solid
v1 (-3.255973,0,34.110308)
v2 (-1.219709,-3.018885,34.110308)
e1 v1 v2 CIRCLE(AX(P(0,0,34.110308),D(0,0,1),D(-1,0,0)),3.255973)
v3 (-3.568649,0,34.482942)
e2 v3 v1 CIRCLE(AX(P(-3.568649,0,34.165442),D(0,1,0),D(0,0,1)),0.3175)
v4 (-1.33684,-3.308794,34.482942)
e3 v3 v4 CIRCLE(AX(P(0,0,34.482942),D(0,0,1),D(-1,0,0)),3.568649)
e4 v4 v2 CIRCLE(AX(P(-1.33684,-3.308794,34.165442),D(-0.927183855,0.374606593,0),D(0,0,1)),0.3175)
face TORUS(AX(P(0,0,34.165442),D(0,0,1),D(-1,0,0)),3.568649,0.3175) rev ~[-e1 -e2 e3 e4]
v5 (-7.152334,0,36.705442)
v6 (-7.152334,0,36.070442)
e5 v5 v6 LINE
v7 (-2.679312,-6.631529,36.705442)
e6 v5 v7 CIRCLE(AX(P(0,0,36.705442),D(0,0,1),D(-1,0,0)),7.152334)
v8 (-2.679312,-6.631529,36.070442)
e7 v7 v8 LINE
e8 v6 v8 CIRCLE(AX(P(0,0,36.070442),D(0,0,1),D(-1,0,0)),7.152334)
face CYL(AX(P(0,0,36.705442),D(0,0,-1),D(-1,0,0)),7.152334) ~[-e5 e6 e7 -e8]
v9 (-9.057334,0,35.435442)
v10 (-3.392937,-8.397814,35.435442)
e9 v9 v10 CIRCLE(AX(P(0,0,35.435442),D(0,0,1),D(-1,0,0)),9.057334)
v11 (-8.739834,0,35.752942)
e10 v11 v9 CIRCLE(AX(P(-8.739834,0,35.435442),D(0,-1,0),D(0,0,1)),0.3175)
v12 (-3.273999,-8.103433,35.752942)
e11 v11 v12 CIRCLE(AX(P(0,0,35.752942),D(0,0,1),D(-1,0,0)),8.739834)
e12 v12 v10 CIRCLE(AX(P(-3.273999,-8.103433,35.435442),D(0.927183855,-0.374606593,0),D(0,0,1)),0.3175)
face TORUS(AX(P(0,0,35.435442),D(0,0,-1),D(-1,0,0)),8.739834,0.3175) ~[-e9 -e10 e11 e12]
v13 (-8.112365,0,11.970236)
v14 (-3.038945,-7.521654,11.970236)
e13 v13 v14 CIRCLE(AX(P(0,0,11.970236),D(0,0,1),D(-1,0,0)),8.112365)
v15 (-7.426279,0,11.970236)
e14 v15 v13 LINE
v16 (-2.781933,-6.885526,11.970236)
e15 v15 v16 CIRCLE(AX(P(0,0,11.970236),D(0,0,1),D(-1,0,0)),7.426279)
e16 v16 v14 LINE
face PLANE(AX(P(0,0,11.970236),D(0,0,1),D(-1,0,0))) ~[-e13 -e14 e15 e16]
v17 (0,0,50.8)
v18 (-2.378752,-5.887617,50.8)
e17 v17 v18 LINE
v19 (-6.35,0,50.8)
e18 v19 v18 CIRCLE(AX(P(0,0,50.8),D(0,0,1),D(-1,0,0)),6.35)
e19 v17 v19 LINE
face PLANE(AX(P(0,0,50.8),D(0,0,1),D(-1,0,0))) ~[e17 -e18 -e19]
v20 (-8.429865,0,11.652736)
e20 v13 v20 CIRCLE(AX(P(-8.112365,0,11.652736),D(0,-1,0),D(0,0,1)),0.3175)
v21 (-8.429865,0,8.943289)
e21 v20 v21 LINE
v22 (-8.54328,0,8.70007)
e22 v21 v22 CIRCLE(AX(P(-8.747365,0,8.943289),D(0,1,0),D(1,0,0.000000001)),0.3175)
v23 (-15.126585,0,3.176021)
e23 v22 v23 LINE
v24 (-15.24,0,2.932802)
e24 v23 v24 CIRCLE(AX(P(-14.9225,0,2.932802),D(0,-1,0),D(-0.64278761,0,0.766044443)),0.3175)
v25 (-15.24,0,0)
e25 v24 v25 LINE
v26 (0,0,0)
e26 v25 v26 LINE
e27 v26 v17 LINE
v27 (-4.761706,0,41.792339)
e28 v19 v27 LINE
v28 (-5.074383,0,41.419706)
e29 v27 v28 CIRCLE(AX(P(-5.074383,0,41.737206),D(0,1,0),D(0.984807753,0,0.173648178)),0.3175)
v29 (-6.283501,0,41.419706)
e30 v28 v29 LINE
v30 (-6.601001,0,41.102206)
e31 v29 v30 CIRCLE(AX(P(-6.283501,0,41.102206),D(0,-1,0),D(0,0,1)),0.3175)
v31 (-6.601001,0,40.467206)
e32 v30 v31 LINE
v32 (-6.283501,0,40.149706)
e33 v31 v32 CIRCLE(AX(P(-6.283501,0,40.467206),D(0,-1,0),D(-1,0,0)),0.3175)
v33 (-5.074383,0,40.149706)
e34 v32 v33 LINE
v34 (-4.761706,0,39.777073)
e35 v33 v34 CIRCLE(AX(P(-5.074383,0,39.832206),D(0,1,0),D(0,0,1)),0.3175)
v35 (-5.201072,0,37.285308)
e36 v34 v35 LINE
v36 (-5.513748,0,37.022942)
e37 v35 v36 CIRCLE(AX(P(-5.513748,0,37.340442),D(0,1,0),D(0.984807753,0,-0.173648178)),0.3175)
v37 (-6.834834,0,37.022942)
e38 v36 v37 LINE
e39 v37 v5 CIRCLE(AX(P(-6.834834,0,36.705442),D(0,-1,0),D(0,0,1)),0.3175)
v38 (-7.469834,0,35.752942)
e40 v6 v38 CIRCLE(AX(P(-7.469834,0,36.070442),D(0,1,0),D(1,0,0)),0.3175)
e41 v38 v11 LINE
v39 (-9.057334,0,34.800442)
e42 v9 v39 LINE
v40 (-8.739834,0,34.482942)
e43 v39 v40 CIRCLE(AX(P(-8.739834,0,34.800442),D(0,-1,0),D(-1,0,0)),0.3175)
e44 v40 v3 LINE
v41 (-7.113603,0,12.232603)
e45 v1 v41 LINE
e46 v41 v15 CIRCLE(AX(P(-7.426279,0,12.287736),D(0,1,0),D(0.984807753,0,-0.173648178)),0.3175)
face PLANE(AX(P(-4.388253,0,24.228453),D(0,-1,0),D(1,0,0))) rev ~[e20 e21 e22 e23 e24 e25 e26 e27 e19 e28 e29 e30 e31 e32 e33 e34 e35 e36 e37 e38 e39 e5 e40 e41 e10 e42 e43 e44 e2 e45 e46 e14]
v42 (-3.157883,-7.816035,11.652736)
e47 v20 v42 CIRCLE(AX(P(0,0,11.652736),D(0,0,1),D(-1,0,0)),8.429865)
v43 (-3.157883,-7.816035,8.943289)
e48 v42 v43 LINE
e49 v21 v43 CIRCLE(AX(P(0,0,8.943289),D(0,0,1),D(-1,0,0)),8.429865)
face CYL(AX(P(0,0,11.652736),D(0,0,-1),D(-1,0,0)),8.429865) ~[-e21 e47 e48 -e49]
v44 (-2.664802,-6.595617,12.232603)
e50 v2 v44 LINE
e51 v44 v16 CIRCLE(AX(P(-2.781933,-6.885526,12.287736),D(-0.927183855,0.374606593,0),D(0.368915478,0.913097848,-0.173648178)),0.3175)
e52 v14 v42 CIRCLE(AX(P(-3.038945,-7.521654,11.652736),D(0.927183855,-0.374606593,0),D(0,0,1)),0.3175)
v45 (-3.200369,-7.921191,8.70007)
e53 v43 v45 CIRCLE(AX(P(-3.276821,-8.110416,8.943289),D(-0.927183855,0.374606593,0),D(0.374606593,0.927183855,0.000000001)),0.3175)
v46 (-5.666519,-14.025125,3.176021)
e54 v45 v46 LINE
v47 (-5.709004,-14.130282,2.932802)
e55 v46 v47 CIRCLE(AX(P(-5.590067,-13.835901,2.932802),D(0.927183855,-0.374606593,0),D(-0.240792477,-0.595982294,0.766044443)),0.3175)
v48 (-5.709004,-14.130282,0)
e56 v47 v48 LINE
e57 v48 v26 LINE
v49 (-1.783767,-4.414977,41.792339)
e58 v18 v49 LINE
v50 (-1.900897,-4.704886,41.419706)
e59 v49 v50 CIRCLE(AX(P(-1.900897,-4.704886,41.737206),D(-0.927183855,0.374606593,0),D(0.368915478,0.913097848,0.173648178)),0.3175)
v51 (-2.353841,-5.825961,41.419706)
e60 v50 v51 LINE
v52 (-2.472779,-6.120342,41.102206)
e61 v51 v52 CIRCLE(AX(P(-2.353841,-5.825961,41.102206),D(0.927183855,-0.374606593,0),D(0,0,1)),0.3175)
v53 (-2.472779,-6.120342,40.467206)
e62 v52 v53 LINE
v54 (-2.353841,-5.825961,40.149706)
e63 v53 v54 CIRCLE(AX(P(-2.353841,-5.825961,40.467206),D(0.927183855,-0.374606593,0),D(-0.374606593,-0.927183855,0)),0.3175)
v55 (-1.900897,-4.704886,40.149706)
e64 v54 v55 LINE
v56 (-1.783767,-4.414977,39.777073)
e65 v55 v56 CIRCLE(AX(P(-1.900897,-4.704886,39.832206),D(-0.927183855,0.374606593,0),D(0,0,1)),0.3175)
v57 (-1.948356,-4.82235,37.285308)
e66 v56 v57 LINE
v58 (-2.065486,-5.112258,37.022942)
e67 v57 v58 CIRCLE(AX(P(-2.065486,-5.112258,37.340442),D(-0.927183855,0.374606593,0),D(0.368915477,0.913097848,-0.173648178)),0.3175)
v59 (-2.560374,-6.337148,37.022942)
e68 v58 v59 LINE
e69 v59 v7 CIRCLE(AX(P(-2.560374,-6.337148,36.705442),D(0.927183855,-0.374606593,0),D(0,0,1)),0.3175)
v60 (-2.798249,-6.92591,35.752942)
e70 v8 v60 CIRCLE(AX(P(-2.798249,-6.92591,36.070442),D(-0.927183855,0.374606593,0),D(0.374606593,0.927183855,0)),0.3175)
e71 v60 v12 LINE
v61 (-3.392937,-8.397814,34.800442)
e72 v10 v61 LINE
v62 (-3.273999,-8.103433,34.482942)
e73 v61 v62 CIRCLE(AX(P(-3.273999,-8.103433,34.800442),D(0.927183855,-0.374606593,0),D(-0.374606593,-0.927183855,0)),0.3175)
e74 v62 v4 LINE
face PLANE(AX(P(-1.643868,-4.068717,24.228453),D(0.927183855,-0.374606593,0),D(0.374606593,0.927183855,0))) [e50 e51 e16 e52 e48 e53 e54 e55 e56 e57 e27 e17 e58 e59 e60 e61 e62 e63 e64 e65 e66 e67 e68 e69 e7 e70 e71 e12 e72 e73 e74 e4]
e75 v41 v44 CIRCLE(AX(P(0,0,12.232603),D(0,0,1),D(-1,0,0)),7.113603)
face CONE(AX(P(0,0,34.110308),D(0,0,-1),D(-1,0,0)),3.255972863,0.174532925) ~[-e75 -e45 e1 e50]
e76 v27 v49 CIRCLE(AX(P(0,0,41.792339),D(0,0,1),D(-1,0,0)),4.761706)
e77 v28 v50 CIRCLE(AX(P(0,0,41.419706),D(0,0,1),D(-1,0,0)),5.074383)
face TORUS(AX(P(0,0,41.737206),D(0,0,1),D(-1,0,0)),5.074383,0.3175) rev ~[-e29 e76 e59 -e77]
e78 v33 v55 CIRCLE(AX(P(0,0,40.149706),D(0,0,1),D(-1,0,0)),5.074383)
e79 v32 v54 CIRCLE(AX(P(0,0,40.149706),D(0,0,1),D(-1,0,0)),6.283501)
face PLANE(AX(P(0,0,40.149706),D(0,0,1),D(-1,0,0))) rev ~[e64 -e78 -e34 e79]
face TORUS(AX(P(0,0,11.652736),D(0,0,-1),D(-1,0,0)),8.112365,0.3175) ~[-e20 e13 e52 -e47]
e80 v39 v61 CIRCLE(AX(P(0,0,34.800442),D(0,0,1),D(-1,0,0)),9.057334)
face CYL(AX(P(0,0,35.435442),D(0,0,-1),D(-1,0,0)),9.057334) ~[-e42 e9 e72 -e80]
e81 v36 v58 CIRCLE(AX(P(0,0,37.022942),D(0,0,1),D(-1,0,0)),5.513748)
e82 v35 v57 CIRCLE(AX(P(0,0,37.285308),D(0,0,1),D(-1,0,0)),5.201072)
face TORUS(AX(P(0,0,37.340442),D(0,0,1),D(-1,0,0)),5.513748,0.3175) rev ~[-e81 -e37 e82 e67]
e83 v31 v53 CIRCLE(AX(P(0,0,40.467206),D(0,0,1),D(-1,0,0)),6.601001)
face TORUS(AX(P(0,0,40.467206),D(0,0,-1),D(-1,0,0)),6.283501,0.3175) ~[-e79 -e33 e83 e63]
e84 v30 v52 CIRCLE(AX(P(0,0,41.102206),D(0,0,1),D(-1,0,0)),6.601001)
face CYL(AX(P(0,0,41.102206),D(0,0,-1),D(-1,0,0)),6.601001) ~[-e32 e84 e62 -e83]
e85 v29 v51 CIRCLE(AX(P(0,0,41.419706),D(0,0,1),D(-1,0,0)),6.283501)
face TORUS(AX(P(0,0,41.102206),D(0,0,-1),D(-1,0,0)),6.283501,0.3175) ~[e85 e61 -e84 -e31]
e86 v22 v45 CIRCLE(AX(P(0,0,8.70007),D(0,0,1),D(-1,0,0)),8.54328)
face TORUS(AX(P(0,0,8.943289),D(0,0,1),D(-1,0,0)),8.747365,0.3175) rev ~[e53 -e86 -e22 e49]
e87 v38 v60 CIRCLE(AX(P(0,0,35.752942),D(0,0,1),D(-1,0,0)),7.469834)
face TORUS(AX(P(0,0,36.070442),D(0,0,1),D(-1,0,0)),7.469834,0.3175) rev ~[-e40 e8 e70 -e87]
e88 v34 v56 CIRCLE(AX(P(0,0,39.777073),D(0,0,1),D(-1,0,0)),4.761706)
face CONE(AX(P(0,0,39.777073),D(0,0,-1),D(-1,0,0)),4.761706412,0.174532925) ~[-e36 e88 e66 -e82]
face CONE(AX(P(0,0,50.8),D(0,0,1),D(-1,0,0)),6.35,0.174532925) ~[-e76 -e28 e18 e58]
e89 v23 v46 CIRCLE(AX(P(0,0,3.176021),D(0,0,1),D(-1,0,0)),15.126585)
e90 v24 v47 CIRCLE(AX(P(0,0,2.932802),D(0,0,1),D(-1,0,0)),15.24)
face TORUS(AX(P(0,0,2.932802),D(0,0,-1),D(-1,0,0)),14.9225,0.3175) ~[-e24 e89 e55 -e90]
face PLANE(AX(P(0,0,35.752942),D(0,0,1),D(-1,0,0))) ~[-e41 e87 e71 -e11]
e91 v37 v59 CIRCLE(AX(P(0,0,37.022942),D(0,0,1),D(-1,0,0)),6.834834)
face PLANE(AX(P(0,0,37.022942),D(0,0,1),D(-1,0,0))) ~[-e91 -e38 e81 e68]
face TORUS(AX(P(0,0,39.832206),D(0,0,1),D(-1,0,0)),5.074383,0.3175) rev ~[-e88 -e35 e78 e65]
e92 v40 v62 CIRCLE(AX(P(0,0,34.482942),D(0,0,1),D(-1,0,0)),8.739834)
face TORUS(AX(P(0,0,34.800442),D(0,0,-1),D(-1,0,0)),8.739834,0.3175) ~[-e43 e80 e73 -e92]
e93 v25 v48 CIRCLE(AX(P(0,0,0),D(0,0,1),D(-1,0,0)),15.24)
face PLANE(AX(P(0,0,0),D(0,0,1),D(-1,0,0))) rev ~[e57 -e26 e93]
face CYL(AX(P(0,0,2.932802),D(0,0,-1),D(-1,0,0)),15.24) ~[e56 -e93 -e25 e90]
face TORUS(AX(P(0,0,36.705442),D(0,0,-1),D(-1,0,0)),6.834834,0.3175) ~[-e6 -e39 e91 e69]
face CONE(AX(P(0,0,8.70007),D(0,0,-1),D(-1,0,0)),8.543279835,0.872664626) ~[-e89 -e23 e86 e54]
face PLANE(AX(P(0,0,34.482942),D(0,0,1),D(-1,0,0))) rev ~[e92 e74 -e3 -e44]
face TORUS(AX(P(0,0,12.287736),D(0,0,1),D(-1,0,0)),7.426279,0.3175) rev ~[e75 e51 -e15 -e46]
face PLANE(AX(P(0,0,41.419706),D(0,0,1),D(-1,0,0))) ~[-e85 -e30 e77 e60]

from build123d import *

# Parameters (mm, degrees)
F1_ANGLE = 68


# Not quite as in the source:
# - a feature of the source that left no trace in its solid (it failed there, or was rolled back) is left out


with BuildPart() as f1:
    # F0 (on Front) → F1 (revolve)
    with BuildSketch(Plane.XZ):
        with BuildLine():
            Line((-15.24, 0), (0, 0))
            Line((0, 0), (0, 50.8))
            Line((0, 50.8), (-6.35, 50.8))
            Line((-6.35, 50.8), (-4.7617064118, 41.792339449))
            ThreePointArc((-4.7617064118, 41.792339449), (-4.8311637627, 41.5331210865), (-5.0743828734, 41.4197061526))
            Line((-5.0743828734, 41.4197061526), (-6.2835011077, 41.4197061526))
            ThreePointArc((-6.2835011077, 41.4197061526), (-6.5080075107, 41.3267125556), (-6.6010011077, 41.1022061526))
            Line((-6.6010011077, 41.1022061526), (-6.6010011077, 40.4672061526))
            ThreePointArc((-6.6010011077, 40.4672061526), (-6.5080075107, 40.2426997495), (-6.2835011077, 40.1497061526))
            Line((-6.2835011077, 40.1497061526), (-5.0743828734, 40.1497061526))
            ThreePointArc((-5.0743828734, 40.1497061526), (-4.8311637627, 40.0362912186), (-4.7617064118, 39.7770728561))
            Line((-4.7617064118, 39.7770728561), (-5.2010717431, 37.2853082403))
            ThreePointArc((-5.2010717431, 37.2853082403), (-5.3096631386, 37.0972224261), (-5.5137482047, 37.0229415367))
            Line((-5.5137482047, 37.0229415367), (-6.8348340718, 37.0229415367))
            ThreePointArc((-6.8348340718, 37.0229415367), (-7.0593404748, 36.9299479398), (-7.1523340718, 36.7054415367))
            Line((-7.1523340718, 36.7054415367), (-7.1523340718, 36.0704415367))
            ThreePointArc((-7.1523340718, 36.0704415367), (-7.2453276688, 35.8459351337), (-7.4698340718, 35.7529415367))
            Line((-7.4698340718, 35.7529415367), (-8.7398340718, 35.7529415367))
            ThreePointArc((-8.7398340718, 35.7529415367), (-8.9643404748, 35.6599479398), (-9.0573340718, 35.4354415367))
            Line((-9.0573340718, 35.4354415367), (-9.0573340718, 34.8004415367))
            ThreePointArc((-9.0573340718, 34.8004415367), (-8.9643404748, 34.5759351337), (-8.7398340718, 34.4829415367))
            Line((-8.7398340718, 34.4829415367), (-3.5686493249, 34.4829415367))
            ThreePointArc((-3.5686493249, 34.4829415367), (-3.3254302142, 34.3695266028), (-3.2559728633, 34.1103082403))
            Line((-3.2559728633, 34.1103082403), (-7.113602572, 12.2326030065))
            ThreePointArc((-7.113602572, 12.2326030065), (-7.2221939675, 12.0445171922), (-7.4262790336, 11.9702363029))
            Line((-7.4262790336, 11.9702363029), (-8.1123649007, 11.9702363029))
            ThreePointArc((-8.1123649007, 11.9702363029), (-8.3368713037, 11.8772427059), (-8.4298649007, 11.6527363029))
            Line((-8.4298649007, 11.6527363029), (-8.4298649007, 8.9432889844))
            ThreePointArc((-8.4298649007, 8.9432889844), (-8.4596121783, 8.8091076862), (-8.5432798346, 8.7000698737))
            Line((-8.5432798346, 8.7000698737), (-15.1265850661, 3.176020882))
            ThreePointArc((-15.1265850661, 3.176020882), (-15.2102527224, 3.0669830694), (-15.24, 2.9328017713))
            Line((-15.24, 2.9328017713), (-15.24, 0))
        make_face()
    revolve(axis=Axis((0, 0, 25.4), (0, 0, 1)), revolution_arc=F1_ANGLE)


solid = f1.part
